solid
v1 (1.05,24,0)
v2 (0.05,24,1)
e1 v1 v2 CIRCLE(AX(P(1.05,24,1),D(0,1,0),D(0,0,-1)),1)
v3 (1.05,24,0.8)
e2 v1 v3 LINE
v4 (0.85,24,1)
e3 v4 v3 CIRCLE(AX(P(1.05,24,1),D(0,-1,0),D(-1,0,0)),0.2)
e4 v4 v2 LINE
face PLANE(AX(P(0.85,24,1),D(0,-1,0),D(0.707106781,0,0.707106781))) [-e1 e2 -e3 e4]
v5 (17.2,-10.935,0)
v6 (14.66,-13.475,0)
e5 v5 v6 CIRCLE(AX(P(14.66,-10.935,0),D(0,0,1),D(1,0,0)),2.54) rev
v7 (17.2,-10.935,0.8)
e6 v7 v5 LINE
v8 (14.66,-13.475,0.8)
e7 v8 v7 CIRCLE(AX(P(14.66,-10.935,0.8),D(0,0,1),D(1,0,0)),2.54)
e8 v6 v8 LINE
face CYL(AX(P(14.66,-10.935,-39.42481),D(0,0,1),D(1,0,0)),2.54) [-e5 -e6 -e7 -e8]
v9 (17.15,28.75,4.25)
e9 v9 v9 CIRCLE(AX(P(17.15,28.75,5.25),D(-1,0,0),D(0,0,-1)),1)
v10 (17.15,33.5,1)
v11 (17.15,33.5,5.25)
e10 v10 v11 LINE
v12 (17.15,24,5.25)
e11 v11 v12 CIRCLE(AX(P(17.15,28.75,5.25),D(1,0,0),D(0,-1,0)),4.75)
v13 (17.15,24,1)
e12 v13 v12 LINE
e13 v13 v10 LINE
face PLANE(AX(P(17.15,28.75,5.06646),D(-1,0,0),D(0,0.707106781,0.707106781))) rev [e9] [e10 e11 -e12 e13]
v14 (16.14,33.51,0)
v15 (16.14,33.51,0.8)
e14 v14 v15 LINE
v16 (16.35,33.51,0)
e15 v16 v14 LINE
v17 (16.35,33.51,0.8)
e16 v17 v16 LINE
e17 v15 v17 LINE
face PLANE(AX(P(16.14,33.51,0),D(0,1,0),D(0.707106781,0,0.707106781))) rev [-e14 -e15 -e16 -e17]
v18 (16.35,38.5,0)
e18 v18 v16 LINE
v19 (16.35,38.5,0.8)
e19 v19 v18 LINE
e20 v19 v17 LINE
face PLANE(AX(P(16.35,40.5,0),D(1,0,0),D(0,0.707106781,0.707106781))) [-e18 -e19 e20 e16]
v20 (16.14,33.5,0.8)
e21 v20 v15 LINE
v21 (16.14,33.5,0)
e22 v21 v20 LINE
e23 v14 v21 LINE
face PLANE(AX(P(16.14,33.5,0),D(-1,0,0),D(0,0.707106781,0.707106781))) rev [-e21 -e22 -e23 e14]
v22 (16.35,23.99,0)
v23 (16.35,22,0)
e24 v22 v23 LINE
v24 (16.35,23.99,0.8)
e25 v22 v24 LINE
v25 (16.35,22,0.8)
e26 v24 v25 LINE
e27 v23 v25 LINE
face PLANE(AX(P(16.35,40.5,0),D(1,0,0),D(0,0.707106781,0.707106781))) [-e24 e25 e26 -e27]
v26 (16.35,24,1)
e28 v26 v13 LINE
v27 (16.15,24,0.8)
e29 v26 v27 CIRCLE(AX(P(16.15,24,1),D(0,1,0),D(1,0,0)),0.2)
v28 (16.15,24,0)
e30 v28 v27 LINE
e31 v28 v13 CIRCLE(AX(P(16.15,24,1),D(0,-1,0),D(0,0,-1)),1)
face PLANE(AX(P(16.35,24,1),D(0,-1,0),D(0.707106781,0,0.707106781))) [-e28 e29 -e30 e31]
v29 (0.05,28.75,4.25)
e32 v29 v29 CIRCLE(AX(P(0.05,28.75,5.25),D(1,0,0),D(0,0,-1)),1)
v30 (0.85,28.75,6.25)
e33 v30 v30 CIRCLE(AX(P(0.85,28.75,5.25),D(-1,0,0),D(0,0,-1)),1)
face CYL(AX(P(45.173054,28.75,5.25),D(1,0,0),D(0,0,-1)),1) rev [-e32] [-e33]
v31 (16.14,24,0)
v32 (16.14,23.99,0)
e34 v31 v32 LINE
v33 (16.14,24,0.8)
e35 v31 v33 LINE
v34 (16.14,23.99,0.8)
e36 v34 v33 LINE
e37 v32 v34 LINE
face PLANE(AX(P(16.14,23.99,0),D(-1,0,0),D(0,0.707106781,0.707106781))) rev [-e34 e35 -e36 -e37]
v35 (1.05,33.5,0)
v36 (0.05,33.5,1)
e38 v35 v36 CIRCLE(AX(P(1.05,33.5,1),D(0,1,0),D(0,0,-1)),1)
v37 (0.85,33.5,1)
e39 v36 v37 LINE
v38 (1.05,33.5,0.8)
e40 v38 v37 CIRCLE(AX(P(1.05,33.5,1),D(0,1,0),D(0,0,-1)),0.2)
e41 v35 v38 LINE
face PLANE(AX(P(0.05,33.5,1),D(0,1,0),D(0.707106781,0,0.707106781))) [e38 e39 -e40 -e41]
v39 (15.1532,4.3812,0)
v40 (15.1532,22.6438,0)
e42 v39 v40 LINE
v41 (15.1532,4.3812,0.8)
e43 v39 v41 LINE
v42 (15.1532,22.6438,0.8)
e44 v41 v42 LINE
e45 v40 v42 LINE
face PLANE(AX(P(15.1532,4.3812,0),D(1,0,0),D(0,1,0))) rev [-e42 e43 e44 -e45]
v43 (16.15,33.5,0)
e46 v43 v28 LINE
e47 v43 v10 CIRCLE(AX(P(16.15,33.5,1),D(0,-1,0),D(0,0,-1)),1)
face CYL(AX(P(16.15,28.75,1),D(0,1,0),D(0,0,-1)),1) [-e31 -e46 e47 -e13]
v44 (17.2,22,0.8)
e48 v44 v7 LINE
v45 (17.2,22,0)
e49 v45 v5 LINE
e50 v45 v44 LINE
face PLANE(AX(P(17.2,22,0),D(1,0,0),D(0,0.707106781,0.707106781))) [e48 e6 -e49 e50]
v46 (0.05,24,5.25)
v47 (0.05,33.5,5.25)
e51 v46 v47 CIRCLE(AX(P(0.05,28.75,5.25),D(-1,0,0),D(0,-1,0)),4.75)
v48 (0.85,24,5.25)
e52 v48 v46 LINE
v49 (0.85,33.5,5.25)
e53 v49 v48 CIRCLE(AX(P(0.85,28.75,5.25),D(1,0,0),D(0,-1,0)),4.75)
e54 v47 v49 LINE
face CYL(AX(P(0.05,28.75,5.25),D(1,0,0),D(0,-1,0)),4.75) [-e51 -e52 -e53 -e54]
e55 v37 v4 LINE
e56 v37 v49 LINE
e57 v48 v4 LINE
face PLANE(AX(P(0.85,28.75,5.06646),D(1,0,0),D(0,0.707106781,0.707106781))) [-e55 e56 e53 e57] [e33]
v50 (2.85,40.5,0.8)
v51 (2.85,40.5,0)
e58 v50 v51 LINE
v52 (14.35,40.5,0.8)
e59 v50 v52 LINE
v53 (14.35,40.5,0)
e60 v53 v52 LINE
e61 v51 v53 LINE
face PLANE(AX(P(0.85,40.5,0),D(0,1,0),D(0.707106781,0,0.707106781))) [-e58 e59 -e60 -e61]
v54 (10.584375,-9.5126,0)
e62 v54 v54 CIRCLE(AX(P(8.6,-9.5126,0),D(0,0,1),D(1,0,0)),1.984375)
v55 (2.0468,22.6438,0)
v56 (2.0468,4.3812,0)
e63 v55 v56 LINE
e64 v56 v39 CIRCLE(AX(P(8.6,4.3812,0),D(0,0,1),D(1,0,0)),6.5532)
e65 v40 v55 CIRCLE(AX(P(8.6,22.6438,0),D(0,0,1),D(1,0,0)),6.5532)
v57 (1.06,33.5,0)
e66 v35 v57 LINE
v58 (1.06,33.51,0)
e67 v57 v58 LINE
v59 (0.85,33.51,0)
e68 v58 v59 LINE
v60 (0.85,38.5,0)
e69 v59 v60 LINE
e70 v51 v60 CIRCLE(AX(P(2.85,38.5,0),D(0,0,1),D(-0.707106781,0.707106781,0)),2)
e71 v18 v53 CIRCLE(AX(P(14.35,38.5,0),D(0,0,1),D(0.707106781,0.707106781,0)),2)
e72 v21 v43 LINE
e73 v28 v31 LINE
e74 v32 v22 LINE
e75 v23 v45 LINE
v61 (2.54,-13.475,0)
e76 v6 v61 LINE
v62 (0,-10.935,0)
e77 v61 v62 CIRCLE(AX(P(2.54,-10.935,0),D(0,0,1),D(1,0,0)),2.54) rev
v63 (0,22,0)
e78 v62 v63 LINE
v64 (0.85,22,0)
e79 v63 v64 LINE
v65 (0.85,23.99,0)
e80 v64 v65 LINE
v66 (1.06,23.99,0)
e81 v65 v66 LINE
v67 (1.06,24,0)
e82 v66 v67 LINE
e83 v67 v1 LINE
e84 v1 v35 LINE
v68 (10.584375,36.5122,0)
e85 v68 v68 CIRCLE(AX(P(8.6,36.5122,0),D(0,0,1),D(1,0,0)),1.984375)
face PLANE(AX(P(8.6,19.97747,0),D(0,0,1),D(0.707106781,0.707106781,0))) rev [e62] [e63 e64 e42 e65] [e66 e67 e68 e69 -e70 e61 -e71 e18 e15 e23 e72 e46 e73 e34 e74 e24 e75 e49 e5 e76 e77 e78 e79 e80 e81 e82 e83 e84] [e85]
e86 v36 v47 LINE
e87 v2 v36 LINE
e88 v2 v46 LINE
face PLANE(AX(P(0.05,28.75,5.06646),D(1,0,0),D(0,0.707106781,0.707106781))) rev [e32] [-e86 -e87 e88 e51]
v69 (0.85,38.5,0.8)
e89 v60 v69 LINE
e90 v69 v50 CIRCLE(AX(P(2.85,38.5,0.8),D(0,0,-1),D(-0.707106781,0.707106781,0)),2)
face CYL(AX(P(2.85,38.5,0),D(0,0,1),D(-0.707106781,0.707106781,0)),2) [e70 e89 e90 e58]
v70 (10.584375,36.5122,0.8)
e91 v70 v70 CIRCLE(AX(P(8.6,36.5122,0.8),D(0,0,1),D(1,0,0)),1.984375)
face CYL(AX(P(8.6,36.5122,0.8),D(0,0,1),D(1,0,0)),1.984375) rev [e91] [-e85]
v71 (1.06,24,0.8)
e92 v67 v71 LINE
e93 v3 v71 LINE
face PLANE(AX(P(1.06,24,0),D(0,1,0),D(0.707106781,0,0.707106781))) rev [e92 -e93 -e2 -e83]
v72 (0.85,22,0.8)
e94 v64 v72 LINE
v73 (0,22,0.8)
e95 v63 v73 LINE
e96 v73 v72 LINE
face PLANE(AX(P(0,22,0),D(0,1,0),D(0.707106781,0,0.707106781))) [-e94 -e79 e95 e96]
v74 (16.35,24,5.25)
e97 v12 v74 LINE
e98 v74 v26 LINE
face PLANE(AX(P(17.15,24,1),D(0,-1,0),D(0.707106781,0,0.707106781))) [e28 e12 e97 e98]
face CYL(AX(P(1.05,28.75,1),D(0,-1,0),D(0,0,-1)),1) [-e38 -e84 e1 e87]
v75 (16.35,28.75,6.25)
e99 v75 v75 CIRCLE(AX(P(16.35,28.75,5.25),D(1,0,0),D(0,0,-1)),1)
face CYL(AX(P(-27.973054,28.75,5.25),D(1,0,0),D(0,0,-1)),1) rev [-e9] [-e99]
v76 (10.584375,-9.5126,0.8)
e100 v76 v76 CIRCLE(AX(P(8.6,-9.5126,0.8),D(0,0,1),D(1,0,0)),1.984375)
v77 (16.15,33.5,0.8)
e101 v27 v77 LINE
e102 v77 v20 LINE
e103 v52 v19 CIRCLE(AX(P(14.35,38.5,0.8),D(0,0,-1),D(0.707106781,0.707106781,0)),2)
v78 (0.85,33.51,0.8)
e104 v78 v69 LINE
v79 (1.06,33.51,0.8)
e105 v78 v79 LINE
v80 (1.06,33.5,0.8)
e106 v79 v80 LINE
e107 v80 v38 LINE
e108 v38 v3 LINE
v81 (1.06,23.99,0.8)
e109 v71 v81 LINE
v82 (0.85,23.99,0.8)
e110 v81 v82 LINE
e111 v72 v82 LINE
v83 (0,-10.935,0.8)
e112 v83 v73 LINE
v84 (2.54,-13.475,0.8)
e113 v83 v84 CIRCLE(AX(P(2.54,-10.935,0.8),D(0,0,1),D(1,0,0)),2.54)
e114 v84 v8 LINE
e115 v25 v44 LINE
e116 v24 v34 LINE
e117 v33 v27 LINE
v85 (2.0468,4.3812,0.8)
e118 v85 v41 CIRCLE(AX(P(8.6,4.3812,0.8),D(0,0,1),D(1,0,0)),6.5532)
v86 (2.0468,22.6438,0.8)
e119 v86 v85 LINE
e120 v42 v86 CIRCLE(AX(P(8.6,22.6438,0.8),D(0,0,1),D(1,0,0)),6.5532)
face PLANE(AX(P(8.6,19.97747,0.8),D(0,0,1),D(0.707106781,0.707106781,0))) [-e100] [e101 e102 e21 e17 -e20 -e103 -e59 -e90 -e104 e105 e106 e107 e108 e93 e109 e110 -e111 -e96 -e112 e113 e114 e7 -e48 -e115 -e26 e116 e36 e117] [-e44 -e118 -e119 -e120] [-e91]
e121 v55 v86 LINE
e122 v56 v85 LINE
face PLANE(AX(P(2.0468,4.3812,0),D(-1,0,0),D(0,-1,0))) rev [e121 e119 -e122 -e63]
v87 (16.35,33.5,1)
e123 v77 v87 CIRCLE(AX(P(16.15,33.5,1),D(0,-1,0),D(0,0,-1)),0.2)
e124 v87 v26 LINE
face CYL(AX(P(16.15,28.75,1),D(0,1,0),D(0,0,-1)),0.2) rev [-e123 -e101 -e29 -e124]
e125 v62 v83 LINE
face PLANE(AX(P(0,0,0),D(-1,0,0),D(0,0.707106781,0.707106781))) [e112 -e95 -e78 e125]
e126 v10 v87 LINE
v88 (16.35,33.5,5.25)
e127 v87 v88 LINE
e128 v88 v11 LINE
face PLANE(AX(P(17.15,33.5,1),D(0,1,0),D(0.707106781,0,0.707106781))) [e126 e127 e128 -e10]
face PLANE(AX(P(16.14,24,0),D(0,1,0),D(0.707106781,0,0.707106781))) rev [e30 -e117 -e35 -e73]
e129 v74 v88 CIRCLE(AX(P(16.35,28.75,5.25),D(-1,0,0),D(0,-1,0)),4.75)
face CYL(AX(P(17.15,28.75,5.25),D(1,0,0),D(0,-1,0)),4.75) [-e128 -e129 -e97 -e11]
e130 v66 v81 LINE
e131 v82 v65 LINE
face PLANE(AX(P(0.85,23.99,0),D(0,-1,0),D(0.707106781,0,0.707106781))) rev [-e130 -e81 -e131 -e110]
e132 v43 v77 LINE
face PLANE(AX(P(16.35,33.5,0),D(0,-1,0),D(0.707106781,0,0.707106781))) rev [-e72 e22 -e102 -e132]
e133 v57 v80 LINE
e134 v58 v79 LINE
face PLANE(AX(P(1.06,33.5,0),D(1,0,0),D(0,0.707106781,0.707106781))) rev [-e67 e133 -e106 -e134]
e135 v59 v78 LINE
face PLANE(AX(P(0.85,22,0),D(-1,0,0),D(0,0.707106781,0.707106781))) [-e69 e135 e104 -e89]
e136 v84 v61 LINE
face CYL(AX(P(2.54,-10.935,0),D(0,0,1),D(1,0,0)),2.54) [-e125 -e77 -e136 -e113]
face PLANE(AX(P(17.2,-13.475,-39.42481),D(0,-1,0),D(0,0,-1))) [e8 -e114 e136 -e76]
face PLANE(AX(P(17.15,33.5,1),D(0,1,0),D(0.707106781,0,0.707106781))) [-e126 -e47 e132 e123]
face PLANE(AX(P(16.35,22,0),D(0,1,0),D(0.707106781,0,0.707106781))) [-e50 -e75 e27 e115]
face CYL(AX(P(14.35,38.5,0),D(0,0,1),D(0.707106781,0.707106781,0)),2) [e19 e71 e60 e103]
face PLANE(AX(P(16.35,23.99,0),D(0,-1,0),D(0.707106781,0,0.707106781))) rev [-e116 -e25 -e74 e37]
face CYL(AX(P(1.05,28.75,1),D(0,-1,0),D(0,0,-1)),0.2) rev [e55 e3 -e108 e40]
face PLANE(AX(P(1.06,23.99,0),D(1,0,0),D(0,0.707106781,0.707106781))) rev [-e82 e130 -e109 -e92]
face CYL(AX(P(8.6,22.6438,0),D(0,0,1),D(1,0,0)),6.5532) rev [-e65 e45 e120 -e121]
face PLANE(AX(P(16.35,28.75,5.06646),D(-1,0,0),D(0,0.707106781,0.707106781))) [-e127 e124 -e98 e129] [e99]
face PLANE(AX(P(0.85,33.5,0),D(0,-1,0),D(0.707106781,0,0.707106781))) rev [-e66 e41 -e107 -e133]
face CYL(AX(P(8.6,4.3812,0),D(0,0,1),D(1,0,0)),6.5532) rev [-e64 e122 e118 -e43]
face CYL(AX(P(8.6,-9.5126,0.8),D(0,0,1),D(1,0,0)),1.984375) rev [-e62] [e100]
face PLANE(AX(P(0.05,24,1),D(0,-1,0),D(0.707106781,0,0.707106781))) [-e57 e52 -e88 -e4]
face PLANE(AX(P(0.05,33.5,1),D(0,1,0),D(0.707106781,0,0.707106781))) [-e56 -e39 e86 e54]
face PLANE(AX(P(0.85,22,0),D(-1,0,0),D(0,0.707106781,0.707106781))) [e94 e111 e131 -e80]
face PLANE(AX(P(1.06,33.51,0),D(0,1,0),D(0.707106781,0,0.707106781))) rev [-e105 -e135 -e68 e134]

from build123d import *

# Parameters (mm, degrees)
BOSS_EXTRUDE1_START             = -0.8
BOSS_EXTRUDE1_DEPTH             = 1
BOSS_EXTRUDE1_2_OUTLINE_W       = 0.8
BOSS_EXTRUDE1_2_OUTLINE_H       = 9.5
BOSS_EXTRUDE1_2_DEPTH           = 9.2
BOSS_EXTRUDE1_START_2           = 0.85
BOSS_EXTRUDE1_3_OUTLINE_W       = 40.5
BOSS_EXTRUDE1_3_OUTLINE_H       = 0.2
BOSS_EXTRUDE1_3_DEPTH           = 15.5
BOSS_EXTRUDE1_4_OUTLINE_R       = 1
BOSS_EXTRUDE1_4_OUTLINE_W       = 22
BOSS_EXTRUDE1_4_OUTLINE_H       = 0.2
BOSS_EXTRUDE1_4_DEPTH           = 17.2
BOSS_EXTRUDE1_START_3           = 17.112671
BOSS_EXTRUDE1_5_OUTLINE_W       = 9.5
BOSS_EXTRUDE1_5_OUTLINE_H       = 0.2
BOSS_EXTRUDE1_5_DEPTH           = 0.037329
BOSS_EXTRUDE1_START_4           = 0.05
BOSS_EXTRUDE1_6_OUTLINE_W       = 9.5
BOSS_EXTRUDE1_6_OUTLINE_H       = 0.2
BOSS_EXTRUDE1_6_DEPTH           = 0.032671
BOSS_EXTRUDE1_START_5           = 24
BOSS_EXTRUDE1_7_DEPTH           = 9.5
BOSS_EXTRUDE1_8_DEPTH           = 9.5
SKETCH2_W                       = 17.2
SKETCH2_H                       = 35.475
BOSS_EXTRUDE2_DEPTH             = 0.8
FILLET1_R                       = 2.54
F_5_32_0_15625_DIAMETER_HOLE1_D = 3.96875
CUT_EXTRUDE1_DEPTH              = 45.952530518


with BuildPart() as part:
    # Boss-Extrude1: read off the stored shape, not the designer's step
    # Boss-Extrude1 outline → Boss-Extrude1 (new body)
    with BuildSketch(Plane.XY.offset(0.8).offset(BOSS_EXTRUDE1_START)):
        with BuildLine():
            Line((0.05, 24), (1.06, 24))
            Line((1.06, 24), (1.06, 23.99))
            Line((1.06, 23.99), (0.85, 23.99))
            Line((0.85, 23.99), (0.85, 22))
            Line((0.85, 22), (0, 22))
            Line((0, 22), (0, 2))
            ThreePointArc((0, 2), (0.585786438, 0.585786438), (2, 0))
            Line((2, 0), (15.2, 0))
            ThreePointArc((15.2, 0), (16.614213562, 0.585786438), (17.2, 2))
            Line((17.2, 2), (17.2, 22))
            Line((17.2, 22), (16.35, 22))
            Line((16.35, 22), (16.35, 23.99))
            Line((16.35, 23.99), (16.14, 23.99))
            Line((16.14, 23.99), (16.14, 24))
            Line((16.14, 24), (17.15, 24))
            Line((17.15, 24), (17.15, 33.5))
            Line((17.15, 33.5), (16.14, 33.5))
            Line((16.14, 33.5), (16.14, 33.51))
            Line((16.14, 33.51), (16.35, 33.51))
            Line((16.35, 33.51), (16.35, 38.5))
            ThreePointArc((16.35, 38.5), (15.764213562, 39.914213562), (14.35, 40.5))
            Line((14.35, 40.5), (2.85, 40.5))
            ThreePointArc((2.85, 40.5), (1.435786438, 39.914213562), (0.85, 38.5))
            Line((0.85, 38.5), (0.85, 33.51))
            Line((0.85, 33.51), (1.06, 33.51))
            Line((1.06, 33.51), (1.06, 33.5))
            Line((1.06, 33.5), (0.05, 33.5))
            Line((0.05, 33.5), (0.05, 24))
        make_face()
    extrude(amount=BOSS_EXTRUDE1_DEPTH)

    # Boss-Extrude1 2 outline → Boss-Extrude1 2 (add)
    with BuildSketch(Plane.XY.offset(0.8)):
        with Locations((0.45, 28.75)):
            Rectangle(BOSS_EXTRUDE1_2_OUTLINE_W, BOSS_EXTRUDE1_2_OUTLINE_H)
        with Locations((16.75, 28.75)):
            Rectangle(BOSS_EXTRUDE1_2_OUTLINE_W, BOSS_EXTRUDE1_2_OUTLINE_H)
    extrude(amount=BOSS_EXTRUDE1_2_DEPTH)

    # Boss-Extrude1 3 outline → Boss-Extrude1 3 (cut)
    with BuildSketch(Plane.YZ.offset(BOSS_EXTRUDE1_START_2)):
        with Locations((20.25, 0.9)):
            Rectangle(BOSS_EXTRUDE1_3_OUTLINE_W, BOSS_EXTRUDE1_3_OUTLINE_H)
    extrude(amount=BOSS_EXTRUDE1_3_DEPTH, mode=Mode.SUBTRACT)

    # Boss-Extrude1 4 outline → Boss-Extrude1 4 (cut)
    with BuildSketch(Plane.YZ):
        with Locations((28.75, 5.25)):
            Circle(BOSS_EXTRUDE1_4_OUTLINE_R)
        with BuildLine():
            ThreePointArc((28.75, 10), (32.108757211, 8.608757211), (33.5, 5.25))
            Line((33.5, 5.25), (33.5, 10))
            Line((33.5, 10), (28.75, 10))
        make_face()
        with BuildLine():
            ThreePointArc((24, 5.25), (25.391242789, 8.608757211), (28.75, 10))
            Line((28.75, 10), (24, 10))
            Line((24, 10), (24, 5.25))
        make_face()
        with Locations((11, 0.9)):
            Rectangle(BOSS_EXTRUDE1_4_OUTLINE_W, BOSS_EXTRUDE1_4_OUTLINE_H)
    extrude(amount=BOSS_EXTRUDE1_4_DEPTH, mode=Mode.SUBTRACT)

    # Boss-Extrude1 5 outline → Boss-Extrude1 5 (cut)
    with BuildSketch(Plane.YZ.offset(BOSS_EXTRUDE1_START_3)):
        with Locations((28.75, 0.9)):
            Rectangle(BOSS_EXTRUDE1_5_OUTLINE_W, BOSS_EXTRUDE1_5_OUTLINE_H)
    extrude(amount=BOSS_EXTRUDE1_5_DEPTH, mode=Mode.SUBTRACT)

    # Boss-Extrude1 6 outline → Boss-Extrude1 6 (cut)
    with BuildSketch(Plane.YZ.offset(BOSS_EXTRUDE1_START_4)):
        with Locations((28.75, 0.9)):
            Rectangle(BOSS_EXTRUDE1_6_OUTLINE_W, BOSS_EXTRUDE1_6_OUTLINE_H)
    extrude(amount=BOSS_EXTRUDE1_6_DEPTH, mode=Mode.SUBTRACT)

    # Boss-Extrude1 7 outline → Boss-Extrude1 7 (cut)
    with BuildSketch(Plane(origin=(0, 0, 0), x_dir=(1, 0, 0), z_dir=(0, 1, 0)).offset(BOSS_EXTRUDE1_START_5)):
        with BuildLine():
            Line((0.05, -0.8), (0.070204103, -0.8))
            ThreePointArc((0.070204103, -0.8), (0.417544468, -0.225403331), (1.05, 0))
            Line((1.05, 0), (0.05, 0))
            Line((0.05, 0), (0.05, -0.8))
        make_face()
        with BuildLine():
            ThreePointArc((16.15, 0), (16.782455532, -0.225403331), (17.129795897, -0.8))
            Line((17.129795897, -0.8), (17.15, -0.8))
            Line((17.15, -0.8), (17.15, 0))
            Line((17.15, 0), (16.15, 0))
        make_face()
    extrude(amount=BOSS_EXTRUDE1_7_DEPTH, mode=Mode.SUBTRACT)

    # Boss-Extrude1 8 outline → Boss-Extrude1 8 (add)
    with BuildSketch(Plane(origin=(0, 0, 0), x_dir=(1, 0, 0), z_dir=(0, 1, 0)).offset(BOSS_EXTRUDE1_START_5)):
        with BuildLine():
            Line((0.85, -0.8), (0.85, -1))
            ThreePointArc((0.85, -1), (0.908578644, -0.858578644), (1.05, -0.8))
            Line((1.05, -0.8), (0.85, -0.8))
        make_face()
        with BuildLine():
            Line((16.35, -0.8), (16.15, -0.8))
            ThreePointArc((16.15, -0.8), (16.291421356, -0.858578644), (16.35, -1))
            Line((16.35, -1), (16.35, -0.8))
        make_face()
        with BuildLine():
            Line((0.082671, -1), (0.082671, -0.8))
            Line((0.082671, -0.8), (0.070204103, -0.8))
            ThreePointArc((0.070204103, -0.8), (0.055063847, -0.899491038), (0.05, -1))
            Line((0.05, -1), (0.082671, -1))
        make_face()
        with BuildLine():
            Line((17.129795897, -0.8), (17.112671, -0.8))
            Line((17.112671, -0.8), (17.112671, -1))
            Line((17.112671, -1), (17.15, -1))
            ThreePointArc((17.15, -1), (17.144936153, -0.899491038), (17.129795897, -0.8))
        make_face()
    extrude(amount=BOSS_EXTRUDE1_8_DEPTH)

    # Sketch2 → Boss-Extrude2 (add)
    with BuildSketch(Plane.XY.offset(0.8)):
        with Locations((8.6, 4.2625)):
            Rectangle(SKETCH2_W, SKETCH2_H)
    extrude(amount=-BOSS_EXTRUDE2_DEPTH)

    # Fillet1
    fillet1_edges = [part.edges().sort_by_distance(p)[0] for p in [
        (0, -13.475, 0.4),
        (17.2, -13.475, 0.4),
    ]]
    fillet(fillet1_edges, radius=FILLET1_R)

    # 5/32 (0.15625) Diameter Hole1 (through all)
    with Locations(Plane.XY.offset(0.8)):
        with Locations((8.6, -9.5126), (8.6, 36.5122)):
            Hole(F_5_32_0_15625_DIAMETER_HOLE1_D / 2)

    # Sketch5 → Cut-Extrude1 (cut, through all)
    with BuildSketch(Plane.XY.offset(0.8)):
        with BuildLine():
            Line((2.0468, 4.3812), (2.0468, 22.6438))
            ThreePointArc((2.0468, 22.6438), (8.6, 29.197), (15.1532, 22.6438))
            Line((15.1532, 22.6438), (15.1532, 4.3812))
            ThreePointArc((15.1532, 4.3812), (8.6, -2.172), (2.0468, 4.3812))
        make_face()
    extrude(amount=-CUT_EXTRUDE1_DEPTH, mode=Mode.SUBTRACT)


solid = part.part
